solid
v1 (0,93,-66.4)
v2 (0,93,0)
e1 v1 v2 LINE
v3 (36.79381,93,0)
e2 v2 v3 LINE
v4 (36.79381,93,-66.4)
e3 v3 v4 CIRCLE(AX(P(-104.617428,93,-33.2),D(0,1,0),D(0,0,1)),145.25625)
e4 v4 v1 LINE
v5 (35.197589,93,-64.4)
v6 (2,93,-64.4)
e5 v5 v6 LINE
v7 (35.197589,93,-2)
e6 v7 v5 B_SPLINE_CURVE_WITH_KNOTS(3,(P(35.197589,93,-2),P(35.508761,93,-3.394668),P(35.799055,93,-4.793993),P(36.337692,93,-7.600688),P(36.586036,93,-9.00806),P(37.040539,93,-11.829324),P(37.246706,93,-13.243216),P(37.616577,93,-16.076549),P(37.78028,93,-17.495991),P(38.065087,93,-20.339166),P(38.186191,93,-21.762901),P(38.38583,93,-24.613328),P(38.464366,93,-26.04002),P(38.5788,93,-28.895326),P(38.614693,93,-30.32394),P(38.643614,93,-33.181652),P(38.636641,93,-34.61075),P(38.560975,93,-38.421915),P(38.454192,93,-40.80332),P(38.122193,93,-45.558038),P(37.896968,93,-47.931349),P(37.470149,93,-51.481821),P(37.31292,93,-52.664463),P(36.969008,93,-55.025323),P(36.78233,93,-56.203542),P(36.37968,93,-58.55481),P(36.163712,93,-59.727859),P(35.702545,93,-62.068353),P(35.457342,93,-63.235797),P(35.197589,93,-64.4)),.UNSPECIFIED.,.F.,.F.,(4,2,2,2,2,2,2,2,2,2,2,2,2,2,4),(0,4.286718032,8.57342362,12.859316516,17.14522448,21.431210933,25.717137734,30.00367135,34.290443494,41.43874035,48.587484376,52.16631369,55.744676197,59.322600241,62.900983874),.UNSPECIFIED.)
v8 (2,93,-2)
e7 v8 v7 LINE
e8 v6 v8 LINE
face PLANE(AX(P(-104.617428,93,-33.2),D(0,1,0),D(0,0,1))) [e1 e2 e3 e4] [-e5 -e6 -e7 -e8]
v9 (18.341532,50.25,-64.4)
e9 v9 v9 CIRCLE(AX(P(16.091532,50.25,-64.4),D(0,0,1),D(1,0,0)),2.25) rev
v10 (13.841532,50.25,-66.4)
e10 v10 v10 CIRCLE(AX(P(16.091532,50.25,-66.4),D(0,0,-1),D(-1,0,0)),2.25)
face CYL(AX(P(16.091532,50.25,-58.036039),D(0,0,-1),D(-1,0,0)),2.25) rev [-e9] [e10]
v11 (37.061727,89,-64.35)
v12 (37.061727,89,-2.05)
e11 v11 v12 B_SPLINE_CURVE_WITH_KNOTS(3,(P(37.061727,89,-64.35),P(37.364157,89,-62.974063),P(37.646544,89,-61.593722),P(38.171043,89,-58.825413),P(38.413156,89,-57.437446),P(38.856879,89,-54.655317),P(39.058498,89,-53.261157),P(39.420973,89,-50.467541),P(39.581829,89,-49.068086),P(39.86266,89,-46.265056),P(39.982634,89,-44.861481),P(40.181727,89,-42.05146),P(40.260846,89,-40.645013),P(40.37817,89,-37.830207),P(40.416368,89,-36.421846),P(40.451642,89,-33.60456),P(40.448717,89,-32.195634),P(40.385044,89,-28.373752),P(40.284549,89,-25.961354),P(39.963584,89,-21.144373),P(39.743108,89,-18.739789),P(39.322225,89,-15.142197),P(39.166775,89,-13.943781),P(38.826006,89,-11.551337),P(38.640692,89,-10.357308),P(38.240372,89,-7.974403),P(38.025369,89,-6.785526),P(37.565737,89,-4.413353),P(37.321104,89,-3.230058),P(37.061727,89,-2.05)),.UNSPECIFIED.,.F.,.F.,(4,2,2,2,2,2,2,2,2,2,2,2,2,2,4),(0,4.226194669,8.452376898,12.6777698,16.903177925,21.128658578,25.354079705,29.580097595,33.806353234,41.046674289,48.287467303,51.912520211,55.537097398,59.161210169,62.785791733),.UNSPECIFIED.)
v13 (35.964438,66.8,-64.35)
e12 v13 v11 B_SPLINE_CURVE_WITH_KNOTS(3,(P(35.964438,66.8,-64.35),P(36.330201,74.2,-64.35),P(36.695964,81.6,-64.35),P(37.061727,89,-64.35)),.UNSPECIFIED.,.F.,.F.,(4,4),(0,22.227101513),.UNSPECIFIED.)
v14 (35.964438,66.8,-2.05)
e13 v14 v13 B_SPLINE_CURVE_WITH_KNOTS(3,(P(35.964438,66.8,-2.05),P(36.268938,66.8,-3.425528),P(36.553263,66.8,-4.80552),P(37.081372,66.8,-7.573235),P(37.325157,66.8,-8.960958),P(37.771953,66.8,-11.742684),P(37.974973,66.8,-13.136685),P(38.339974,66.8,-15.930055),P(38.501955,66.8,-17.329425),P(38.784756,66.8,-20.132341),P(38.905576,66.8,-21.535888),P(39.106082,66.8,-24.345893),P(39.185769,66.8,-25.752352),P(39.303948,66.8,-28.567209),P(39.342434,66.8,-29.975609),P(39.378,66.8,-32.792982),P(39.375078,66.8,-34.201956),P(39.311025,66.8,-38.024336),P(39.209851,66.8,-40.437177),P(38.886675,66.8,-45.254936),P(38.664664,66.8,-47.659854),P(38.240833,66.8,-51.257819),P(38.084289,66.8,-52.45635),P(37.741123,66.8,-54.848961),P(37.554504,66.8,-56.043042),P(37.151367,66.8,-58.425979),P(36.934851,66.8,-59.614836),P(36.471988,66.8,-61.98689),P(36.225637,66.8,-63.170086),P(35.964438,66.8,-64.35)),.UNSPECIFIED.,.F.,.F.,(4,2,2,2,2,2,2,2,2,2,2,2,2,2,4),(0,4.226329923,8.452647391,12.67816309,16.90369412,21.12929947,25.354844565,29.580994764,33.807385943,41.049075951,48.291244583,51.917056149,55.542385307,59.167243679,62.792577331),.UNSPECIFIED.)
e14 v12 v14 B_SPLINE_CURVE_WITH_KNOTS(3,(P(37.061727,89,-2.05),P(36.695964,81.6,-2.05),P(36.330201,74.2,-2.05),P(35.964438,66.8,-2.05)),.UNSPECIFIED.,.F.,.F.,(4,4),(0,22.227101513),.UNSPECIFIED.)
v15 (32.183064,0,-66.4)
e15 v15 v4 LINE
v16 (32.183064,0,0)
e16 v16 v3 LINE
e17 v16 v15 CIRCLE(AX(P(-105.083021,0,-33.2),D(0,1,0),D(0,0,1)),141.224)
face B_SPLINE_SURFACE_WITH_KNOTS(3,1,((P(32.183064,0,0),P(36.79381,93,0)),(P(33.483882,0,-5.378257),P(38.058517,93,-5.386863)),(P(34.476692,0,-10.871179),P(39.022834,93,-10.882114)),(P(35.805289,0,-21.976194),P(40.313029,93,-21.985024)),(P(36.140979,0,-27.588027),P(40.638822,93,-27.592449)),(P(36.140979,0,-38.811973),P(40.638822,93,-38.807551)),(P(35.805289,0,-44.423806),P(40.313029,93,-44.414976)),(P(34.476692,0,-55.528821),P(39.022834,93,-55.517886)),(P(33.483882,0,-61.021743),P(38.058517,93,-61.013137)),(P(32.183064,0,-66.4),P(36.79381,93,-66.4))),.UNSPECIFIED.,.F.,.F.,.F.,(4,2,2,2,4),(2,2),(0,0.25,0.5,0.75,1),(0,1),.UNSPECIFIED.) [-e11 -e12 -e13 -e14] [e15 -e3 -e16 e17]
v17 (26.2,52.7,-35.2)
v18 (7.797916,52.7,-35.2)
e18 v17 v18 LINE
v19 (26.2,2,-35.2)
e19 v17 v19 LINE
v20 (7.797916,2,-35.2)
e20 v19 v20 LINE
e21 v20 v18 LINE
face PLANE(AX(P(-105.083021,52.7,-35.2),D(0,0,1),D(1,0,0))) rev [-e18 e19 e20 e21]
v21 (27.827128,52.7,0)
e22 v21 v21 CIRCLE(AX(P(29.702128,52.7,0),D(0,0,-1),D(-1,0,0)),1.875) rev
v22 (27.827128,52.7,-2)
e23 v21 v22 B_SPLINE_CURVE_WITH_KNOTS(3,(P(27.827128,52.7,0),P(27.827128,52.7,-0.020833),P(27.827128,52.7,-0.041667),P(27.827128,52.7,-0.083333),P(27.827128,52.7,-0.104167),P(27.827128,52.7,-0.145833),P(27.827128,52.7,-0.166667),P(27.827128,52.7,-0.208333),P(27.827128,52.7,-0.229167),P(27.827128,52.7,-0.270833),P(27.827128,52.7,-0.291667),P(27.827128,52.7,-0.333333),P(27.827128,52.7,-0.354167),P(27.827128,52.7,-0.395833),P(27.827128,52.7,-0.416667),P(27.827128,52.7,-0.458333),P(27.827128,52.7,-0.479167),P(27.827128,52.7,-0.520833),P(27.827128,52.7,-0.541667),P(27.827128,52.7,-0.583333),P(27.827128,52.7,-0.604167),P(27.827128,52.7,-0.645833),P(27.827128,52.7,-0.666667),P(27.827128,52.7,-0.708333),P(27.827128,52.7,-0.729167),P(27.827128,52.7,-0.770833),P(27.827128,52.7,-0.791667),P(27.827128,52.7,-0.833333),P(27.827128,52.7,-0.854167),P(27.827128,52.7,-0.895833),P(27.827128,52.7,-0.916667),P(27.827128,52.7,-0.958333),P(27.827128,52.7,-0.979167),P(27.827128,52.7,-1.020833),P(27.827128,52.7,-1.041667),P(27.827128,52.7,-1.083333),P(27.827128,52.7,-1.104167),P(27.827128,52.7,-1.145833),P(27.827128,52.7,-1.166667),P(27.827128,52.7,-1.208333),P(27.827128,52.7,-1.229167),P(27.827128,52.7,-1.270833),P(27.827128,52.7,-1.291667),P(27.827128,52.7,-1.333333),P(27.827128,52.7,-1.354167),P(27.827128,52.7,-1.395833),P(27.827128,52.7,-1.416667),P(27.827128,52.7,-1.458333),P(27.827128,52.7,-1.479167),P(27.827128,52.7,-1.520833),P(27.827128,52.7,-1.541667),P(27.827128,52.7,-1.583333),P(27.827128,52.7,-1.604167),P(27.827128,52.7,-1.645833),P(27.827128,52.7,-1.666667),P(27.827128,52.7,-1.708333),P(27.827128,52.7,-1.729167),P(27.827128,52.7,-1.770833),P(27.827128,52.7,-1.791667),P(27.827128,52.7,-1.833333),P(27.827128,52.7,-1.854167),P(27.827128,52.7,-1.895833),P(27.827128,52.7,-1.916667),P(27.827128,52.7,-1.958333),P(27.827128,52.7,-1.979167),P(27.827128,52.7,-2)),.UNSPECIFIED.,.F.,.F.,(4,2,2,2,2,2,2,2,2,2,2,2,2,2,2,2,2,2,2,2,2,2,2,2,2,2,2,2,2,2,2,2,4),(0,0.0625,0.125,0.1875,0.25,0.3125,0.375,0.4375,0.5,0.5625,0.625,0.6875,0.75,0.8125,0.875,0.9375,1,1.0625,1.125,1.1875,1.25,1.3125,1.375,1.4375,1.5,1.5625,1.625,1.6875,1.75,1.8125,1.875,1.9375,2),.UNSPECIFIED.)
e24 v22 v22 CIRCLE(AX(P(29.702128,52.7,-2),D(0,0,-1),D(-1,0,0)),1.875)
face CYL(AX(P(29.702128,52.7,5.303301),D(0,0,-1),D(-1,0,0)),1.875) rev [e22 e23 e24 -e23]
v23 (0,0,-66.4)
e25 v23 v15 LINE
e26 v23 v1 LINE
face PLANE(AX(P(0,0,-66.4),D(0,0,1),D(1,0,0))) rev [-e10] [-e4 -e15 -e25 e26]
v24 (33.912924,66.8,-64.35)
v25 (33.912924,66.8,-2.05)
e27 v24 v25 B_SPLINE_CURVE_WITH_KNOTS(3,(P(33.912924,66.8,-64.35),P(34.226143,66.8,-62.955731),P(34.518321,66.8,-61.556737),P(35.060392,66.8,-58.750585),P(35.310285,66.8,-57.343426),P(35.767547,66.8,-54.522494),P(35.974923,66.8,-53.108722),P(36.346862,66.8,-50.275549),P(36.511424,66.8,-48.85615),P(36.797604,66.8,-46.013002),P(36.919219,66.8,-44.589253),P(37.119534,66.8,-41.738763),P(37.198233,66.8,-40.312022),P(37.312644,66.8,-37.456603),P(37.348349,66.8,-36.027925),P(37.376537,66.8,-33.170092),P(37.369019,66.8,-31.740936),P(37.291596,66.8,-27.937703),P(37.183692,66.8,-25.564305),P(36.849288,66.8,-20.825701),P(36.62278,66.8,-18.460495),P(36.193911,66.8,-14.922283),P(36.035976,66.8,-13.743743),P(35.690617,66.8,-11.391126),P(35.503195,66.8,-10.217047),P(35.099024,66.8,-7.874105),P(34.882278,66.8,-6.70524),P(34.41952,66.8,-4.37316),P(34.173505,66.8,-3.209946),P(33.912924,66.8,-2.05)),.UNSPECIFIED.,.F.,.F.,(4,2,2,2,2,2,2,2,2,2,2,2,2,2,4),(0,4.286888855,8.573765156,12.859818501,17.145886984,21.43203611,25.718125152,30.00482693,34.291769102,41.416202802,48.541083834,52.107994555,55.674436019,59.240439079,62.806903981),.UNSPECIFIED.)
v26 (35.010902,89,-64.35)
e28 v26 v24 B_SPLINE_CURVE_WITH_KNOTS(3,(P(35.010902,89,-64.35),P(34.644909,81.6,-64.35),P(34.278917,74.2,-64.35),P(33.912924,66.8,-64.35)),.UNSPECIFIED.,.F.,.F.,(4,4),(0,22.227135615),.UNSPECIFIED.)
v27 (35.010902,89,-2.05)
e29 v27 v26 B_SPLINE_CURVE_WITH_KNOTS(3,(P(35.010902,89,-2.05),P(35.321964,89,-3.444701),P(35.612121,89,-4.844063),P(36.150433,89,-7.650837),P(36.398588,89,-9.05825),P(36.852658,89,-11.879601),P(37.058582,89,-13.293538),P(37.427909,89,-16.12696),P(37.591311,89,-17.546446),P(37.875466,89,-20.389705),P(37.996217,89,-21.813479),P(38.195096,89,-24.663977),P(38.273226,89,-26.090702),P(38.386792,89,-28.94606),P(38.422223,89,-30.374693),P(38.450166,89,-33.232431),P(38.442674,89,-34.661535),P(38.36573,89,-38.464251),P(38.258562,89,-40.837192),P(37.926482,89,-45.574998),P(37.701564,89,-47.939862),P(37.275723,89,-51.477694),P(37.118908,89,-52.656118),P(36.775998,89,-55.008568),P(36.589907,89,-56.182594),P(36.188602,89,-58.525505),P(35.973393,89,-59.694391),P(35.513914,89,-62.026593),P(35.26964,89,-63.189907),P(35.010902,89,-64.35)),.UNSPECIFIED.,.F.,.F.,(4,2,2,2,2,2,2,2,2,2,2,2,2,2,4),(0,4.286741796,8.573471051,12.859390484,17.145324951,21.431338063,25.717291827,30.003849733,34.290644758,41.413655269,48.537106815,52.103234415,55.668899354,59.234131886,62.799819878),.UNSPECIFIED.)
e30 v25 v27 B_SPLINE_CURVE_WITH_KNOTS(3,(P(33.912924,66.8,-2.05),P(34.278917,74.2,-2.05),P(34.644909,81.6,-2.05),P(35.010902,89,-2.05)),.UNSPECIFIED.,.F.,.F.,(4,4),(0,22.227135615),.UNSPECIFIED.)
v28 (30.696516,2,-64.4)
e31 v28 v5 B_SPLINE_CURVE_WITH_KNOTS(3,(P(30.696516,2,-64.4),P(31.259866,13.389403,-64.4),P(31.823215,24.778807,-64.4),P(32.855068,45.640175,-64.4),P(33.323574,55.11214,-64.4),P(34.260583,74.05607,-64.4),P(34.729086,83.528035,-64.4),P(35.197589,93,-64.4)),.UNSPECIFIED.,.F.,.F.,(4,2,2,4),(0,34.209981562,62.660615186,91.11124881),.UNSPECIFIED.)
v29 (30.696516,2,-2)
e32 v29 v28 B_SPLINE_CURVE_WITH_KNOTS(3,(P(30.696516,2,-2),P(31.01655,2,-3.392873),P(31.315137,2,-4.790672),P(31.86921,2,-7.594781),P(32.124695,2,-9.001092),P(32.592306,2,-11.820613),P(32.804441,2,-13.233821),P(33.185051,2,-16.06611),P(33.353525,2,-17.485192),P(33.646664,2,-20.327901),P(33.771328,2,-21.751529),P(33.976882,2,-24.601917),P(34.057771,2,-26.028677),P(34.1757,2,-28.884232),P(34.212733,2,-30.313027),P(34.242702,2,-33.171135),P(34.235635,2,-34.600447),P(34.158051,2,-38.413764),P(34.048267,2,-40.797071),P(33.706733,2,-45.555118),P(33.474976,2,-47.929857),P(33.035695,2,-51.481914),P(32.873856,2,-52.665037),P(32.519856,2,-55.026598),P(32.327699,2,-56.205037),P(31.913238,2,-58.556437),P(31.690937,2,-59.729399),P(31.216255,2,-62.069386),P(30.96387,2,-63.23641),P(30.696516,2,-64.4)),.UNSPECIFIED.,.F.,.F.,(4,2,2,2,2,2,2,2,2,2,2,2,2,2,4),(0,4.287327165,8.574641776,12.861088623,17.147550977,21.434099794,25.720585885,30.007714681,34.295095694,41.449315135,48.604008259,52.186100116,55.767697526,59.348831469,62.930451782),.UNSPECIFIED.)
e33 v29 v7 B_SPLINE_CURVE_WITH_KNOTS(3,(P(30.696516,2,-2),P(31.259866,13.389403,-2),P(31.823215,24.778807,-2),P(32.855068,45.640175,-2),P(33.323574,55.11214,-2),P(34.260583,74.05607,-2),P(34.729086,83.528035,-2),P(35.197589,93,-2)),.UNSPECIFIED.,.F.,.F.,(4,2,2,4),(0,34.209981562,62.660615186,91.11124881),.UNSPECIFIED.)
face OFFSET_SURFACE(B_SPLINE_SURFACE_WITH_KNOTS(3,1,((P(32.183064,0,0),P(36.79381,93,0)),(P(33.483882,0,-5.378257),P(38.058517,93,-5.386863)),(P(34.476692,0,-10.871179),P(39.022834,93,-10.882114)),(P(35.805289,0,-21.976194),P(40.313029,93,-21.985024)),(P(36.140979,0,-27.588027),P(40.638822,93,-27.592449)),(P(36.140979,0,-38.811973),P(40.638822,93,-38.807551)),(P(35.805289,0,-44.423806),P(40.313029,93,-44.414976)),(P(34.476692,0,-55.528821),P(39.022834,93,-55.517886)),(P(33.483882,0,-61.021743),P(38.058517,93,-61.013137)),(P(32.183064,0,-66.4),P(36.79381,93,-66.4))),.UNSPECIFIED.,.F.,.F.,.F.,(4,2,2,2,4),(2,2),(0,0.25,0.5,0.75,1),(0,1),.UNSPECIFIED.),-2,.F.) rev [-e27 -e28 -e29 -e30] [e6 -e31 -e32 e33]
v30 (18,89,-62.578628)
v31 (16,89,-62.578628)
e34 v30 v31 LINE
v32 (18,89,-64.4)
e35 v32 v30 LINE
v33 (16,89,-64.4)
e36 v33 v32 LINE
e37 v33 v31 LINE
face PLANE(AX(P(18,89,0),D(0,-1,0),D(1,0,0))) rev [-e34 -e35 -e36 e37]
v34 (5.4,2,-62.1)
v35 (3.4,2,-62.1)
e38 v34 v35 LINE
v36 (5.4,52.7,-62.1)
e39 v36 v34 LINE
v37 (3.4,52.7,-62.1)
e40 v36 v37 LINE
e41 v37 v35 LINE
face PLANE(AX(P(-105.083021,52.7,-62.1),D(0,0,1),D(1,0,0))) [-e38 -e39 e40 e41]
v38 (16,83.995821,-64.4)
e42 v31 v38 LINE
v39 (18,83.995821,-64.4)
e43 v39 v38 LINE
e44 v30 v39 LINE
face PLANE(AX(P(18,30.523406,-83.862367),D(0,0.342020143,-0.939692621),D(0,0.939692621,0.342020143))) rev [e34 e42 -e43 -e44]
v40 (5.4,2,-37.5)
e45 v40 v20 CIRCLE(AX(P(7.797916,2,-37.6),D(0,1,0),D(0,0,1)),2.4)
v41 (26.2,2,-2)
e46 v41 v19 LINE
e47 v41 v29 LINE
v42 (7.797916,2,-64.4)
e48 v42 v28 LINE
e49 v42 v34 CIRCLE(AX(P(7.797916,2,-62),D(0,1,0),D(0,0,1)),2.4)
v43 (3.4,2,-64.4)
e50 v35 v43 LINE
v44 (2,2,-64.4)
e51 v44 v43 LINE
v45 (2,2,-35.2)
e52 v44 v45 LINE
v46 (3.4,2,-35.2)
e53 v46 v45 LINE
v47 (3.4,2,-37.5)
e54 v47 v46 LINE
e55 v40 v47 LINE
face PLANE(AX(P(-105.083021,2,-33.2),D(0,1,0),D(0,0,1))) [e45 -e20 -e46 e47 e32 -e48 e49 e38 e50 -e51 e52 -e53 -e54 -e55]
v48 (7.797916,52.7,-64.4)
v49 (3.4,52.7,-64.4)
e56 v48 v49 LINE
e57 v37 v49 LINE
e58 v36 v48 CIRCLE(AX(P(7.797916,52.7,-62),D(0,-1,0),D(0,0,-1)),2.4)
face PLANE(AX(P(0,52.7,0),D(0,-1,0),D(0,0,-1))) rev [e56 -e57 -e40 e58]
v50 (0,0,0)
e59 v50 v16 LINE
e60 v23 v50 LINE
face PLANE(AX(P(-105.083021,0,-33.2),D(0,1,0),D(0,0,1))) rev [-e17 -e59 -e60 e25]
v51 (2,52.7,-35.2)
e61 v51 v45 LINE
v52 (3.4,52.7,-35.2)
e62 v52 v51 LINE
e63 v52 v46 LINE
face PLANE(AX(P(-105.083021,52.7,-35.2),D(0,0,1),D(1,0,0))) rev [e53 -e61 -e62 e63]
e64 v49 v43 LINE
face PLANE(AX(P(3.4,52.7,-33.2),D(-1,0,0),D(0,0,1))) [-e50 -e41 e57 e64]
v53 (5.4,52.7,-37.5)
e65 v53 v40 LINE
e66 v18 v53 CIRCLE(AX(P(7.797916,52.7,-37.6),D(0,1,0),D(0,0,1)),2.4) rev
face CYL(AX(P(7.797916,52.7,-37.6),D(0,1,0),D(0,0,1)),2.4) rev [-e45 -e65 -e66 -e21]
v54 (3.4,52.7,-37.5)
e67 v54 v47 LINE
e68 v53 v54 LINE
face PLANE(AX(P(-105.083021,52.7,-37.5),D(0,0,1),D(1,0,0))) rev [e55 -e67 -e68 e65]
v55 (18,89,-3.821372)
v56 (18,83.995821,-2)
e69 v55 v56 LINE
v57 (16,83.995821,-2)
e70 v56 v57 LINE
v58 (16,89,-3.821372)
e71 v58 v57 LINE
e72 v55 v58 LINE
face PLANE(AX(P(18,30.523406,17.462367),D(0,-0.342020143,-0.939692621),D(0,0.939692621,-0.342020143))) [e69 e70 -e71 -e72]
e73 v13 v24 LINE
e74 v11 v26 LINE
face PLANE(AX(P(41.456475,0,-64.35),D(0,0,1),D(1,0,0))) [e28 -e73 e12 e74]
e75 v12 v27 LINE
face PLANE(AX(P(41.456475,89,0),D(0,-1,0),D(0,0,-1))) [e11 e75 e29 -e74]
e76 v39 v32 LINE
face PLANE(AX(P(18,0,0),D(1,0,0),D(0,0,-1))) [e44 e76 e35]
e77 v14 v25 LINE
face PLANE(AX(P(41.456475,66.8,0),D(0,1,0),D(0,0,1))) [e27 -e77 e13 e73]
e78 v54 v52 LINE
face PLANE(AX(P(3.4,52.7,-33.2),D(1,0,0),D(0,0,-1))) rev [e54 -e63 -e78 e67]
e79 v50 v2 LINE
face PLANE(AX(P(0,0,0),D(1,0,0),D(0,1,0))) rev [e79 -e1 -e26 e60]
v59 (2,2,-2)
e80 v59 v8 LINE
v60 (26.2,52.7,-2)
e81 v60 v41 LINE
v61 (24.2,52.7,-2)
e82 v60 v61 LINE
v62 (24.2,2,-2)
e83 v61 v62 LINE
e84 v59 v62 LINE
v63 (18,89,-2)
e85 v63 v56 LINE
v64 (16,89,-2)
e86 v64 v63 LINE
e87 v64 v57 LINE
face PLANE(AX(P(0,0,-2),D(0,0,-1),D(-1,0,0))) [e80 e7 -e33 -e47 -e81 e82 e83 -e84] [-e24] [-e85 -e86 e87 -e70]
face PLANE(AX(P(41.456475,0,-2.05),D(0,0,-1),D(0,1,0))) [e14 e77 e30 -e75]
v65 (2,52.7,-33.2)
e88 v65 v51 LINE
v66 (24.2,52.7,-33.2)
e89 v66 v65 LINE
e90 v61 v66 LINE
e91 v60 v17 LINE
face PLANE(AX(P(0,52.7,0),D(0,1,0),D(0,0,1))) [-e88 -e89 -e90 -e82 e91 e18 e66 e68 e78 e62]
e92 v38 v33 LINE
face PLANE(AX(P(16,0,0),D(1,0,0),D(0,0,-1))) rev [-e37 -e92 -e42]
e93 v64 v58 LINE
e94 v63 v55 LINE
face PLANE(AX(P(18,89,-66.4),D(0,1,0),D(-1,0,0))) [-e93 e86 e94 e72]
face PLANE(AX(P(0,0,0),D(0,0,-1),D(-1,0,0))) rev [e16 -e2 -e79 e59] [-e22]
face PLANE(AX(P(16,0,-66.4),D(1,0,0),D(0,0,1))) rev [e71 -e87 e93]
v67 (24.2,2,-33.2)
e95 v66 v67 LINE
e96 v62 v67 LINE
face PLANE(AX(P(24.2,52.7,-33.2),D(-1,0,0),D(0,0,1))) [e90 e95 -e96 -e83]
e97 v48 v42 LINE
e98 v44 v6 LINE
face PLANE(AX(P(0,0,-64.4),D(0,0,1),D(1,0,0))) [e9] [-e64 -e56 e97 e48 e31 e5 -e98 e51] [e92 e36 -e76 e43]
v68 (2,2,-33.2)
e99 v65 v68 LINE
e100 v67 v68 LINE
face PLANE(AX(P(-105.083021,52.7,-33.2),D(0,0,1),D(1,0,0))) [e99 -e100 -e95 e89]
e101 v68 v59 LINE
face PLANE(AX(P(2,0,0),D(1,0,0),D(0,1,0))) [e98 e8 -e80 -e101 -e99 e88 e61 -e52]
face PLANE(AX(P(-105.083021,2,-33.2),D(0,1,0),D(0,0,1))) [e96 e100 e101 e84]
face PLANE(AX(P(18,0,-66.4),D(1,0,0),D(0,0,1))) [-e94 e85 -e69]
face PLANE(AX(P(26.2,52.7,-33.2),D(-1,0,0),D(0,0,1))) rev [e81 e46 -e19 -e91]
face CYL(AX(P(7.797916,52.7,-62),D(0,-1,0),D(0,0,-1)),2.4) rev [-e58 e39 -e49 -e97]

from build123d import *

# Parameters (mm, degrees)
SHELL1_T               = -2
BOSS_EXTRUDE1_START    = 2
SKETCH7_4_W            = 2
SKETCH7_4_H            = 2.3
BOSS_EXTRUDE1_DEPTH    = 50.7
FILLET1_R              = 2.4
CUT_EXTRUDE1_START     = -40.445352697
CUT_EXTRUDE1_OUTLINE_W = 62.3
CUT_EXTRUDE1_OUTLINE_H = 22.2
CUT_EXTRUDE1_DEPTH     = 6.532429258
BOSS_EXTRUDE2_DEPTH    = 1
SKETCH11_R             = 2.25
CUT_EXTRUDE2_DEPTH     = 2
SKETCH12_R             = 1.875
CUT_EXTRUDE3_DEPTH     = 2


# Read off the part's stored shape, not the designer's step: Cut-Extrude1
with BuildPart() as part:
    # Sketch7 → Loft1 section 0
    with BuildSketch(Plane(origin=(0, 0, 0), x_dir=(1, 0, 0), z_dir=(0, 1, 0))):
        with BuildLine():
            Line((0, 66.4), (32.183064352, 66.4))
            ThreePointArc((32.183064352, 66.4), (36.140979043, 33.2), (32.183064352, 0))
            Line((32.183064352, 0), (0, 0))
            Line((0, 0), (0, 66.4))
        make_face()
    # Sketch1 → Loft1 section 1
    with BuildSketch(Plane(origin=(0, 93, 0), x_dir=(1, 0, 0), z_dir=(0, 1, 0))):
        with BuildLine():
            Line((0, 66.4), (0, 0))
            Line((0, 0), (36.793809788, 0))
            ThreePointArc((36.793809788, 0), (40.63882203, 33.2), (36.793809788, 66.4))
            Line((36.793809788, 66.4), (0, 66.4))
        make_face()
    loft()

    # Shell1
    shell1_openings = [part.faces().sort_by_distance(p)[0] for p in [
        (19.698634873, 93, -33.2),
    ]]
    offset(amount=SHELL1_T, openings=shell1_openings, kind=Kind.INTERSECTION)

    # Sketch7<4> → Boss-Extrude1 (add)
    with BuildSketch(Plane(origin=(0, 0, 0), x_dir=(1, 0, 0), z_dir=(0, 1, 0)).offset(BOSS_EXTRUDE1_START)):
        Polygon((2, 35.2), (2, 33.2), (24.2, 33.2), (24.2, 2), (26.2, 2), (26.2, 35.2), (5.4, 35.2), (3.4, 35.2), align=None)
        with Locations((4.4, 36.35)):
            Rectangle(SKETCH7_4_W, SKETCH7_4_H)
        with Locations((4.4, 63.25)):
            Rectangle(SKETCH7_4_W, SKETCH7_4_H)
    extrude(amount=BOSS_EXTRUDE1_DEPTH)

    # Fillet1
    # the kernel refuses this fillet: 2.4 mm, written as the material it adds along each edge
    with BuildSketch(Plane(origin=(5.4, 2, -35.2), x_dir=(1, 0, 0), z_dir=(0, 1, 0))) as fillet1_piece_1:
        with BuildLine():
            CenterArc((2.397915762, 2.4), FILLET1_R, 182.388015463, 87.611984537)
            Line((0, 2.3), (-0.047958315, 2.298))
            ThreePointArc((-0.047958315, 2.298), (-0.048, 1.15), (-0.048, 0))
            Line((-0.048, 0), (0, -0.048))
            Line((0, -0.048), (2.397915762, -0.048))
            Line((2.397915762, -0.048), (2.397915762, 0))
        make_face()
    extrude(amount=50.7)
    with BuildSketch(Plane(origin=(5.4, 2, -64.4), x_dir=(1, 0, 0), z_dir=(0, 1, 0))) as fillet1_piece_2:
        with BuildLine():
            CenterArc((2.397915762, -2.4), FILLET1_R, 90, 87.611984537)
            Line((0, -2.3), (-0.047958315, -2.298))
            ThreePointArc((-0.047958315, -2.298), (-0.048, -1.15), (-0.048, 0))
            Line((-0.048, 0), (0, 0.048))
            Line((0, 0.048), (2.397915762, 0.048))
            Line((2.397915762, 0.048), (2.397915762, 0))
        make_face()
    extrude(amount=50.7)

    # Cut-Extrude1 outline → Cut-Extrude1 (cut)
    with BuildSketch(Plane.ZY.offset(CUT_EXTRUDE1_START)):
        with Locations((-33.2, 77.9)):
            Rectangle(CUT_EXTRUDE1_OUTLINE_W, CUT_EXTRUDE1_OUTLINE_H)
    extrude(amount=CUT_EXTRUDE1_DEPTH, mode=Mode.SUBTRACT)

    # Sketch10 → Boss-Extrude2 (add, symmetric)
    with BuildSketch(Plane(origin=(17, 0, 0), x_dir=(0, 0, -1), z_dir=(1, 0, 0))):
        Polygon((62.578627716, 89), (64.578627716, 83.505045161), (64.578627716, 89), align=None)
    boss_extrude2 = extrude(amount=BOSS_EXTRUDE2_DEPTH, both=True)

    # Sketch11 → Cut-Extrude2 (cut)
    with BuildSketch(Plane(origin=(0, 0, -66.4), x_dir=(-1, 0, 0), z_dir=(0, 0, -1))):
        with Locations((-16.091532176, 50.25)):
            Circle(SKETCH11_R)
    extrude(amount=-CUT_EXTRUDE2_DEPTH, mode=Mode.SUBTRACT)

    # Sketch12 → Cut-Extrude3 (cut)
    with BuildSketch(Plane(origin=(0, 0, -2), x_dir=(-1, 0, 0), z_dir=(0, 0, -1))):
        with Locations((-29.702128484, 52.7)):
            Circle(SKETCH12_R)
    extrude(amount=-CUT_EXTRUDE3_DEPTH, mode=Mode.SUBTRACT)

    # Mirror1: Boss-Extrude2 across plane
    add(boss_extrude2.mirror(Plane.XY.offset(-33.2)))


solid = part.part
